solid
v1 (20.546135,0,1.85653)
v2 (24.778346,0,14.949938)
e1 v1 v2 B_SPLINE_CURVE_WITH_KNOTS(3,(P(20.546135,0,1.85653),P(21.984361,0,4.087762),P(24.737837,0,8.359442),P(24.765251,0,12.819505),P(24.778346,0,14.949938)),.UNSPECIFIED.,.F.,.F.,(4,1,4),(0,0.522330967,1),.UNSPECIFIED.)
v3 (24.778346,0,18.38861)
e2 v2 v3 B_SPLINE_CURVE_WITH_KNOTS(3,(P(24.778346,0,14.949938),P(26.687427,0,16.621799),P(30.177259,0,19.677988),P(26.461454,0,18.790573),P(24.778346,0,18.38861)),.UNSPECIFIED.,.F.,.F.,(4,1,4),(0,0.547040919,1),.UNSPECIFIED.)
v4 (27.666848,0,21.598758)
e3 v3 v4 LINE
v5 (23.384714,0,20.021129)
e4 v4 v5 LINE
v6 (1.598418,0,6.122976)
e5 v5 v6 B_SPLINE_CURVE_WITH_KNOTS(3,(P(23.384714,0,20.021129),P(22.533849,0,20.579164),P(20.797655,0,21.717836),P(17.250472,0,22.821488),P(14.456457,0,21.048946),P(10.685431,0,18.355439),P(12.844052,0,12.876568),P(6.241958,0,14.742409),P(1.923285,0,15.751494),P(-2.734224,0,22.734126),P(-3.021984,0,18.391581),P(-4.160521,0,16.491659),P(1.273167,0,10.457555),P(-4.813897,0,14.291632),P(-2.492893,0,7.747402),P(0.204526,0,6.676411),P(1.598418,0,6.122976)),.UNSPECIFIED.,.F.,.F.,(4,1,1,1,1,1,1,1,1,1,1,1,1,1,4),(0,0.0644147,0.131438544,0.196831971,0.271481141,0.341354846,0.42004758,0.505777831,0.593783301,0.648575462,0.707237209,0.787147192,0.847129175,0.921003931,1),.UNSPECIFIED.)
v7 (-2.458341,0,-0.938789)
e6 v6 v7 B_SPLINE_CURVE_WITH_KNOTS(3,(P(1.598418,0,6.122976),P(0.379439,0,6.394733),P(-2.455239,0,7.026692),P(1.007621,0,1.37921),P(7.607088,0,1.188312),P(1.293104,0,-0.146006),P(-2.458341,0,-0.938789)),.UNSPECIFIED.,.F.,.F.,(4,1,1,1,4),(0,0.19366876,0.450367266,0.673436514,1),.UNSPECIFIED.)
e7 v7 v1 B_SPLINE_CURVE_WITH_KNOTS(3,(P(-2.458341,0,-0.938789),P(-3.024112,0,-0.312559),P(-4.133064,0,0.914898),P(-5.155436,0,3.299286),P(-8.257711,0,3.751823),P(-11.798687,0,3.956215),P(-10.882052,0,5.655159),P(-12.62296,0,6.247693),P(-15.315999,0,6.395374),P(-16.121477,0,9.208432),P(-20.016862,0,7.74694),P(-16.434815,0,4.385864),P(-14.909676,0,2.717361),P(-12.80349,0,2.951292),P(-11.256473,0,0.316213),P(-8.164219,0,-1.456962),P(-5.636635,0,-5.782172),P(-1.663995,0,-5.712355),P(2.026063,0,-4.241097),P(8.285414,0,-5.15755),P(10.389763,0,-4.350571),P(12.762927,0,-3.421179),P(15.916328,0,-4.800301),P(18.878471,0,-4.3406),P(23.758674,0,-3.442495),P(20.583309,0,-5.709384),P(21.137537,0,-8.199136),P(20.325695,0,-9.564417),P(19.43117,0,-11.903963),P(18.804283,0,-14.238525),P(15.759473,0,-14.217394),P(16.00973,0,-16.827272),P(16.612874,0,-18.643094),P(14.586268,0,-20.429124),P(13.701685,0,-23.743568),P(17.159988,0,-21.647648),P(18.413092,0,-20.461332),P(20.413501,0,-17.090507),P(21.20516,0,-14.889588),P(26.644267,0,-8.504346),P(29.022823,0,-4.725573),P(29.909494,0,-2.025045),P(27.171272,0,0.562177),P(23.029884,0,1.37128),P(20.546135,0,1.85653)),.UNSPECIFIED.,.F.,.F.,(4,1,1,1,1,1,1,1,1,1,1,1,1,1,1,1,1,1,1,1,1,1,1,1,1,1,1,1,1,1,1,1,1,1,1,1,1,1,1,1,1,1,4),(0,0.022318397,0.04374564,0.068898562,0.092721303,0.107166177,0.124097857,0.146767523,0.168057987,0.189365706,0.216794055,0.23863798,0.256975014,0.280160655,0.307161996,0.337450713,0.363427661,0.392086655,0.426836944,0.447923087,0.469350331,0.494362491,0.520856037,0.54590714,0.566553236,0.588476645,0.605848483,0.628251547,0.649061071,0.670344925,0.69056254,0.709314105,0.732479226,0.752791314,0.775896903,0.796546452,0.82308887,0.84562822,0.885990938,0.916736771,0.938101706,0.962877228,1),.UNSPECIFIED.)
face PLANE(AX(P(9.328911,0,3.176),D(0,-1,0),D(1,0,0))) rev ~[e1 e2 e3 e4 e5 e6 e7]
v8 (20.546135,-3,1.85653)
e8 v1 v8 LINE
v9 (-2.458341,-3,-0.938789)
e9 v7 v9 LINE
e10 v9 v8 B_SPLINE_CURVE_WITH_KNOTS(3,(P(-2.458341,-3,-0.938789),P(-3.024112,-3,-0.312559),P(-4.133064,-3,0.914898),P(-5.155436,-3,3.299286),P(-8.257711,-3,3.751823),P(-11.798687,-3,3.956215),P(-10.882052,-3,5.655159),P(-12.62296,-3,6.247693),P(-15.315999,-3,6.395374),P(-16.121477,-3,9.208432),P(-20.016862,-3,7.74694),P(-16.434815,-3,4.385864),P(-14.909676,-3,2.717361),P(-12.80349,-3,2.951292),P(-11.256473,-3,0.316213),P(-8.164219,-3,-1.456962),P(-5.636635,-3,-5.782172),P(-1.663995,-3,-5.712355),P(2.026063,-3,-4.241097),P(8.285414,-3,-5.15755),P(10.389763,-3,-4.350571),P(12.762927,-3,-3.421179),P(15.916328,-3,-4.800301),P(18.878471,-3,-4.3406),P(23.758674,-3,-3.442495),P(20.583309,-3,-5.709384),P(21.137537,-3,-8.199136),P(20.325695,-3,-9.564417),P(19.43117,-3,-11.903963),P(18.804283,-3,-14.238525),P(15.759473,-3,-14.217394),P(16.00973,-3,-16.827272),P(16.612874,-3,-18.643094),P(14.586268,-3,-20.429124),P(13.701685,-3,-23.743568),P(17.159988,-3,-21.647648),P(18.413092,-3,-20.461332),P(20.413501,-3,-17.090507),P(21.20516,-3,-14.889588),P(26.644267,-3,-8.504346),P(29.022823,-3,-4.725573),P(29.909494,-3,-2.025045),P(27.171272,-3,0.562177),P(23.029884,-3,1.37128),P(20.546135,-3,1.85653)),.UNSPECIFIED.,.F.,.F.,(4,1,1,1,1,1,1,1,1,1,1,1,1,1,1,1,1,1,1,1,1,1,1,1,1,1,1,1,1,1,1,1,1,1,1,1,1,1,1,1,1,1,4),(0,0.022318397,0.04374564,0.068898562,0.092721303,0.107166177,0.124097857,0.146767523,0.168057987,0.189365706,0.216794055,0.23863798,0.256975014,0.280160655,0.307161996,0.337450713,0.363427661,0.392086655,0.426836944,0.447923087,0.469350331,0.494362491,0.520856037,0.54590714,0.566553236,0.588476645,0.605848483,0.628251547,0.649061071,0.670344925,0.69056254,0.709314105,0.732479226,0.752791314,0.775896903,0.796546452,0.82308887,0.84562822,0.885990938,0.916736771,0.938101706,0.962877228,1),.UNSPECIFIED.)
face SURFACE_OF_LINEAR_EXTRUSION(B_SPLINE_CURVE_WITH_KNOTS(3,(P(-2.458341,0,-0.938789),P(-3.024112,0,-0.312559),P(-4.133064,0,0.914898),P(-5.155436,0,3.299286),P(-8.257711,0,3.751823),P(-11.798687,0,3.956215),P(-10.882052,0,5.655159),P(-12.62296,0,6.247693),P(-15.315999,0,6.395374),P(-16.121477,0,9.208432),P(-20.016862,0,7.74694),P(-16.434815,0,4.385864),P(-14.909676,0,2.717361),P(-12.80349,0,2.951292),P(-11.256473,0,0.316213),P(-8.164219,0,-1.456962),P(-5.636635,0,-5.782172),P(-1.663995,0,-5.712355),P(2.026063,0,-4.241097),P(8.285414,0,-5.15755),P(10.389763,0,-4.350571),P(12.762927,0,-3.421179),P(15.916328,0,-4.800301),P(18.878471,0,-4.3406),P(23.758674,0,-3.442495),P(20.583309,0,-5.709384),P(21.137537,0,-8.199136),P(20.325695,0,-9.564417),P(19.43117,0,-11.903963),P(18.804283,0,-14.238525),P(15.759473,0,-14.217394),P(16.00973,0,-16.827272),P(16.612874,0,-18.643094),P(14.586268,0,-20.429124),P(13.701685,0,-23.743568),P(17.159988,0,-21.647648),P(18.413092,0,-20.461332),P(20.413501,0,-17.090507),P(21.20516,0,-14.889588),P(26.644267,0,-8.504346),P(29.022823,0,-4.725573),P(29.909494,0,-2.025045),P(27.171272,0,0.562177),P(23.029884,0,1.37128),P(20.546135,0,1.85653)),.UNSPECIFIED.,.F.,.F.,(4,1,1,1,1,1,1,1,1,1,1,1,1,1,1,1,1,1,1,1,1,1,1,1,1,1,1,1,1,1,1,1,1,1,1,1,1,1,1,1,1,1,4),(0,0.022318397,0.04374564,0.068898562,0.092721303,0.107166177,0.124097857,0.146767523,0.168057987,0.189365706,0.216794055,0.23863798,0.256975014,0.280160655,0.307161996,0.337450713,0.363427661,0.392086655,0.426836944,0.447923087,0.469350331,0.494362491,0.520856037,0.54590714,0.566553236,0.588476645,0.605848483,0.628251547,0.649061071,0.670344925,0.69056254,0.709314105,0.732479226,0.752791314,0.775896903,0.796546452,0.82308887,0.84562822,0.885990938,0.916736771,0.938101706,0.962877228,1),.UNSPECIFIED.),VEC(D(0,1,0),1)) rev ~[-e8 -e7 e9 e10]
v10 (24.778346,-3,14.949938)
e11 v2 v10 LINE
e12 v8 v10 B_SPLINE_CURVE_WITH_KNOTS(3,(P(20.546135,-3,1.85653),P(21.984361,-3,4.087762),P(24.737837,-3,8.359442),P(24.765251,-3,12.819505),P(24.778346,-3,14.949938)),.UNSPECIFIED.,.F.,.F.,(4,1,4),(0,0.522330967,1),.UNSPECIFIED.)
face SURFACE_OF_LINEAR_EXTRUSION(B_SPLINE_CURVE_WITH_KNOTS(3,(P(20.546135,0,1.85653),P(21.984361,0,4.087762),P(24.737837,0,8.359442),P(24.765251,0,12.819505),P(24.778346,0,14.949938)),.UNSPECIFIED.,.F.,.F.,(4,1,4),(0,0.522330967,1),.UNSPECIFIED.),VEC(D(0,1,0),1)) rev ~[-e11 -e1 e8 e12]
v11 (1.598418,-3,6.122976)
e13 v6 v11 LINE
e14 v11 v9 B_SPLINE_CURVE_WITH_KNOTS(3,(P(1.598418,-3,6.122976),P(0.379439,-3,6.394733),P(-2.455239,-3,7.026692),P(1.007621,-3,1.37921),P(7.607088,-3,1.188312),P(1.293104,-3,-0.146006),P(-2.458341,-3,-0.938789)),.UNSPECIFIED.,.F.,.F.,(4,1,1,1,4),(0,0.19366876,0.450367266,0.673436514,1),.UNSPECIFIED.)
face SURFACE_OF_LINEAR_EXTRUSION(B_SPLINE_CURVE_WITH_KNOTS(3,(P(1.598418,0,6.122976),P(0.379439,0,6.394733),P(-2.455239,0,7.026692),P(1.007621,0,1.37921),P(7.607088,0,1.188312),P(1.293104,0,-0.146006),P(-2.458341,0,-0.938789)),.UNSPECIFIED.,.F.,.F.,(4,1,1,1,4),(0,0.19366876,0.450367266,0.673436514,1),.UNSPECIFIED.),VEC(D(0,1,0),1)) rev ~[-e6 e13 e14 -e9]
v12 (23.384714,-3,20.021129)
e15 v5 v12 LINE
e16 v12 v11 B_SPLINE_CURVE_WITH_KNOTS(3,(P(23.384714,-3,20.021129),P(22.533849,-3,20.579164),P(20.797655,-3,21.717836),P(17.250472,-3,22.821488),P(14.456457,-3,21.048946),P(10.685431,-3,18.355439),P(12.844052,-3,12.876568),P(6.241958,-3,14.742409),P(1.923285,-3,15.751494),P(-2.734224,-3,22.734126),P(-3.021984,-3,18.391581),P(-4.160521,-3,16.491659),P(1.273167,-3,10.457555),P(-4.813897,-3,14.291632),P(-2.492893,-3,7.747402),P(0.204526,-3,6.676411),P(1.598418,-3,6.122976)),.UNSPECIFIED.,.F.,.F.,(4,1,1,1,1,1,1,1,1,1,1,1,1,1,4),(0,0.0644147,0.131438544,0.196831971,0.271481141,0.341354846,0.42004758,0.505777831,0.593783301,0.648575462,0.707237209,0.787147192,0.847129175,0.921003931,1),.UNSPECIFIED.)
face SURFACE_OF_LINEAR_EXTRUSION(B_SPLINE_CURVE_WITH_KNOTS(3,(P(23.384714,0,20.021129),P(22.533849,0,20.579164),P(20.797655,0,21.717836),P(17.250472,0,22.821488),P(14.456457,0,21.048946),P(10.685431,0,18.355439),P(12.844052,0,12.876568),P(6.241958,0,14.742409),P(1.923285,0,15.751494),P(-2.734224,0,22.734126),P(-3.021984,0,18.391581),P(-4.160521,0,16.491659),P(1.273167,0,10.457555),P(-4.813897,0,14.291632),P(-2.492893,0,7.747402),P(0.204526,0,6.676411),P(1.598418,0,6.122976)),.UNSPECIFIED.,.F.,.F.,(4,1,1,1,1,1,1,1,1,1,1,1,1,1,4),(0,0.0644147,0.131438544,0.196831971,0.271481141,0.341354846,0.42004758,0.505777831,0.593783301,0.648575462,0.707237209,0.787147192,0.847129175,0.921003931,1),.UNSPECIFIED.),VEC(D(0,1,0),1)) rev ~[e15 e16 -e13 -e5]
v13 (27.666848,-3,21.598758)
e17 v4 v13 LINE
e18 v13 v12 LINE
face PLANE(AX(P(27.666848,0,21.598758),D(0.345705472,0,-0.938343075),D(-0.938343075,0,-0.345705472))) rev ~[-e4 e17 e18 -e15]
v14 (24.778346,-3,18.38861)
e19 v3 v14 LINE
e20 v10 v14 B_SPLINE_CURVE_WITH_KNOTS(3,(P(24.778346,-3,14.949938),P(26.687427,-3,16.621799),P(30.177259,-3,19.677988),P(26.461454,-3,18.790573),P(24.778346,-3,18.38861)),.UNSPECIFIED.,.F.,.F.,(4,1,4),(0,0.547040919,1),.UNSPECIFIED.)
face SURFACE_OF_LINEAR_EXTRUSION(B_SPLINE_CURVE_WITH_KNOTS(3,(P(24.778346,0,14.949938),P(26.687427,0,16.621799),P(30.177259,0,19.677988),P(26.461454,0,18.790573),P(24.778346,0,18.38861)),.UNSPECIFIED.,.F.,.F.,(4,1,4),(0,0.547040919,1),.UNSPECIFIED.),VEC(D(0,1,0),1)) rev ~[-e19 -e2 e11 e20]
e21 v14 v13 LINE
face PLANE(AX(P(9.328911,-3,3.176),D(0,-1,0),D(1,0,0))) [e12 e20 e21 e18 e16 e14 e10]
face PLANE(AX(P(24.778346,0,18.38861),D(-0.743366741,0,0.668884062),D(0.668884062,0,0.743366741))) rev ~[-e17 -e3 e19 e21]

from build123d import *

# Parameters (mm, degrees)
F1_DEPTH = 3


with BuildPart() as f1:
    # F0 (on Front) → F1 (new body)
    with BuildSketch(Plane.XZ):
        with BuildLine():
            add(Edge.make_bspline(
                [(-2.4583407212, -0.9387893369), (-3.024112101, -0.3125586215), (-4.1330640857, 0.9148979442), (-5.1554360197, 3.2992855543), (-8.2577109297, 3.7518231514), (-11.7986873567, 3.9562154981), (-10.8820523568, 5.6551586921), (-12.6229603458, 6.247693459), (-15.315999481, 6.3953744354), (-16.1214771708, 9.2084322286), (-20.0168619315, 7.7469403625), (-16.4348146296, 4.3858640835), (-14.9096763531, 2.717360867), (-12.8034903879, 2.9512923233), (-11.2564726008, 0.3162128421), (-8.1642192374, -1.4569620139), (-5.6366346653, -5.782171544), (-1.6639945807, -5.7123551757), (2.0260628096, -4.2410968084), (8.2854144293, -5.1575498991), (10.3897632677, -4.3505708782), (12.7629271987, -3.4211792935), (15.9163275944, -4.8003006369), (18.878470836, -4.3406003478), (23.758674436, -3.4424946888), (20.5833092456, -5.7093836776), (21.1375367591, -8.1991364923), (20.3256954644, -9.5644173556), (19.4311703622, -11.9039628408), (18.8042825389, -14.238524747), (15.7594730051, -14.2173938905), (16.0097304788, -16.8272720908), (16.6128744696, -18.6430937651), (14.5862678652, -20.4291241442), (13.7016849232, -23.7435679152), (17.1599880674, -21.6476481949), (18.4130917332, -20.4613319605), (20.4135012758, -17.0905072069), (21.2051604651, -14.8895883579), (26.6442672206, -8.5043457259), (29.0228229475, -4.7255734803), (29.9094935065, -2.0250450932), (27.1712719561, 0.5621773403), (23.0298835059, 1.3712804026), (20.5461345613, 1.8565304345)],
                knots=[0, 0, 0, 0, 0.0223183973, 0.0437456398, 0.0688985616, 0.0927213027, 0.1071661769, 0.1240978569, 0.1467675231, 0.1680579867, 0.1893657062, 0.2167940554, 0.2386379801, 0.2569750139, 0.2801606546, 0.307161996, 0.3374507126, 0.3634276608, 0.3920866547, 0.4268369435, 0.4479230873, 0.4693503305, 0.4943624909, 0.5208560372, 0.5459071395, 0.5665532363, 0.5884766445, 0.6058484831, 0.628251547, 0.6490610711, 0.6703449254, 0.6905625398, 0.7093141047, 0.7324792265, 0.7527913136, 0.7758969033, 0.7965464522, 0.8230888703, 0.8456282197, 0.8859909385, 0.9167367705, 0.9381017064, 0.9628772275, 1, 1, 1, 1], degree=3))
            add(Edge.make_bspline(
                [(20.5461345613, 1.8565304345), (21.9843605456, 4.0877615411), (24.7378369306, 8.3594422288), (24.7652508293, 12.8195046032), (24.7783455998, 14.9499382824)],
                knots=[0, 0, 0, 0, 0.5223309675, 1, 1, 1, 1], degree=3))
            add(Edge.make_bspline(
                [(24.7783455998, 14.9499382824), (26.6874267886, 16.6217989258), (30.1772593082, 19.6779882987), (26.4614535575, 18.7905731041), (24.7783455998, 18.3886103332)],
                knots=[0, 0, 0, 0, 0.5470409191, 1, 1, 1, 1], degree=3))
            Line((24.7783455998, 18.3886103332), (27.6668481529, 21.598758176))
            Line((27.6668481529, 21.598758176), (23.3847144991, 20.0211293995))
            add(Edge.make_bspline(
                [(23.3847144991, 20.0211293995), (22.5338494252, 20.5791637074), (20.7976546345, 21.7178357343), (17.2504722248, 22.8214880736), (14.4564571643, 21.0489460918), (10.6854307395, 18.3554386667), (12.8440522505, 12.8765681684), (6.2419581214, 14.7424087726), (1.9232853652, 15.7514937162), (-2.7342242262, 22.7341263785), (-3.0219837282, 18.3915805656), (-4.1605211958, 16.4916585466), (1.2731668381, 10.4575548527), (-4.8138967458, 14.2916323506), (-2.4928932067, 7.7474018762), (0.2045257408, 6.6764107619), (1.5984182246, 6.1229756102)],
                knots=[0, 0, 0, 0, 0.0644146999, 0.1314385439, 0.1968319706, 0.2714811413, 0.3413548458, 0.4200475802, 0.5057778314, 0.5937833005, 0.6485754625, 0.7072372091, 0.7871471919, 0.8471291748, 0.9210039306, 1, 1, 1, 1], degree=3))
            add(Edge.make_bspline(
                [(1.5984182246, 6.1229756102), (0.3794385893, 6.3947330374), (-2.4552391583, 7.0266916932), (1.0076209648, 1.3792102604), (7.607088459, 1.1883117848), (1.2931039504, -0.1460062349), (-2.4583407212, -0.9387893369)],
                knots=[0, 0, 0, 0, 0.1936687603, 0.4503672655, 0.6734365138, 1, 1, 1, 1], degree=3))
        make_face()
        with BuildLine():
            add(Edge.make_bspline(
                [(22.6999428123, 19.3365197629), (22.3242155898, 19.5631626942), (21.4544289305, 20.0878278935), (19.2659041282, 21.4051754613), (16.6460371205, 21.4763759863), (13.5816483172, 20.043221821), (12.2892210529, 17.8095974256), (12.5681196065, 15.0871928348), (12.3230838562, 12.8978219278), (8.8639840954, 13.0449553336), (5.2066810805, 14.151426431), (1.707829216, 14.9353315218), (-1.170779148, 18.1401441424), (-1.5655897851, 20.4183641193), (-2.5929770673, 19.4536346829), (-2.5932049211, 17.9614670798), (-2.6339004563, 16.4813338584), (-0.3224472186, 13.7380850634), (0.6135356219, 11.7639540273), (-0.7167249297, 10.8530067604), (-3.3318702702, 12.7121257392), (-2.5667672816, 10.6745545783), (-1.5094169541, 8.4459250214), (2.1106983207, 7.2381496114), (2.7645327104, 6.2696114421), (3.0224460643, 5.8875591494)],
                knots=[0, 0, 0, 0, 0.0345222802, 0.0799170701, 0.1264160139, 0.1782976735, 0.2232215976, 0.270993781, 0.3087962495, 0.3578588003, 0.4157076401, 0.4703647639, 0.5300860598, 0.5673107508, 0.5934188369, 0.6284721036, 0.6631450996, 0.7179951551, 0.7579670519, 0.788326596, 0.8317622624, 0.8624300866, 0.909423256, 0.9642708426, 1, 1, 1, 1], degree=3))
            Line((22.6999428123, 19.3365197629), (26.0433372777, 20.5682971304))
            Line((26.0433372777, 20.5682971304), (24.0020574897, 18.3859034087))
            add(Edge.make_bspline(
                [(17.7613161504, 1.2181339553), (18.3459469112, 2.0293237663), (19.6496885009, 3.8382978482), (22.3270533593, 7.85048253), (23.2824396662, 12.4940733784), (23.1220059605, 15.9857519702), (25.3202795702, 16.5504719842), (27.8645173763, 18.1667392321), (26.1450777549, 18.0905903306), (24.3352004071, 17.6754938561), (24.0907529204, 18.1967651202), (24.0020574897, 18.3859034087)],
                knots=[0, 0, 0, 0, 0.1275196806, 0.284372158, 0.4427790882, 0.5660647269, 0.6719001823, 0.7765117048, 0.8460306235, 0.9441336855, 1, 1, 1, 1], degree=3))
            add(Edge.make_bspline(
                [(24.4001187384, -3.3008425962), (24.3409545974, -3.6554720505), (24.2018944746, -4.4889974695), (22.2223315181, -5.7543203865), (22.4832289942, -8.9296135449), (20.3988923072, -12.2579807717), (20.019356702, -14.9437682798), (17.1257288874, -14.9016519593), (16.6563720182, -16.1673443115), (17.6416824742, -18.42647415), (15.9248500213, -20.4490406816), (14.6742381442, -22.1678172602), (17.3676591915, -20.8599894053), (19.2062636839, -16.9301620982), (22.395345056, -11.5365370821), (25.0840863289, -7.2209170092), (27.9509062353, -4.1529344918), (28.0643595577, -0.9185538348), (21.4065022533, 0.3237566534), (18.8864877652, 0.9420635642), (17.7613161504, 1.2181339553)],
                knots=[0, 0, 0, 0, 0.0342545275, 0.0805122615, 0.1365401346, 0.2013155909, 0.2511031186, 0.3006525471, 0.3335558205, 0.3817053118, 0.4353696827, 0.4714452042, 0.5144946797, 0.5840870765, 0.6661694447, 0.7406786923, 0.8061006005, 0.8549144632, 0.935220163, 1, 1, 1, 1], degree=3))
            add(Edge.make_bspline(
                [(3.0224460643, 5.8875591494), (2.6605674816, 5.7112317822), (1.9018445059, 5.3415397609), (0.613870925, 5.8961917239), (-0.4468114988, 6.1732975767), (-0.5991275153, 5.4758399813), (0.4148661064, 3.8408525846), (1.4386873446, 2.6784537478), (4.8974896565, 1.8585546414), (6.4785231574, 1.348921805), (5.2639700351, -0.4949434958), (1.2648465469, -0.947879165), (-1.7303055212, -1.9880112414), (-4.1498291031, -1.7144645068), (-5.6092074984, 1.0551090331), (-6.2769311874, 2.7645892095), (-9.7310375403, 2.9240494367), (-12.6399330685, 3.4799357512), (-11.5045287811, 6.0347840809), (-15.3225081475, 4.9080547315), (-15.9460754267, 8.0552125685), (-18.1680344995, 7.8080997394), (-17.0845579282, 5.84994772), (-14.9938162063, 4.0224657221), (-13.0229620708, 3.6056954547), (-10.9976580316, 1.8051812839), (-7.6082138342, 0.7572762248), (-5.7361926252, -3.4870897446), (-1.7411166, -4.7228943753), (2.0828785576, -2.7694583145), (7.3146646675, -4.390656531), (11.2428375966, -1.4464033457), (15.8676265775, -3.939807471), (20.2513749856, -2.6018494682), (23.0434376746, -2.7898009003), (24.001643128, -3.1507427259), (24.4001187384, -3.3008425962)],
                knots=[0, 0, 0, 0, 0.0203763207, 0.0427214636, 0.0607192903, 0.0733745539, 0.0987475418, 0.1228836, 0.158441793, 0.1793079016, 0.202042841, 0.23992768, 0.2739458096, 0.3013412751, 0.3334163755, 0.3575495119, 0.3920799182, 0.4213661423, 0.4439054505, 0.4740907577, 0.5042622531, 0.5252665904, 0.5491831564, 0.5810702351, 0.6073180449, 0.6375310291, 0.6721804859, 0.7112858235, 0.7471787688, 0.7851429286, 0.8275064884, 0.8664485522, 0.9072035833, 0.9471463298, 0.9780204773, 1, 1, 1, 1], degree=3))
        make_face(mode=Mode.SUBTRACT)
        with BuildLine():
            Line((26.0433372777, 20.5682971304), (22.6999428123, 19.3365197629))
            add(Edge.make_bspline(
                [(22.6999428123, 19.3365197629), (22.3242155898, 19.5631626942), (21.4544289305, 20.0878278935), (19.2659041282, 21.4051754613), (16.6460371205, 21.4763759863), (13.5816483172, 20.043221821), (12.2892210529, 17.8095974256), (12.5681196065, 15.0871928348), (12.3230838562, 12.8978219278), (8.8639840954, 13.0449553336), (5.2066810805, 14.151426431), (1.707829216, 14.9353315218), (-1.170779148, 18.1401441424), (-1.5655897851, 20.4183641193), (-2.5929770673, 19.4536346829), (-2.5932049211, 17.9614670798), (-2.6339004563, 16.4813338584), (-0.3224472186, 13.7380850634), (0.6135356219, 11.7639540273), (-0.7167249297, 10.8530067604), (-3.3318702702, 12.7121257392), (-2.5667672816, 10.6745545783), (-1.5094169541, 8.4459250214), (2.1106983207, 7.2381496114), (2.7645327104, 6.2696114421), (3.0224460643, 5.8875591494)],
                knots=[0, 0, 0, 0, 0.0345222802, 0.0799170701, 0.1264160139, 0.1782976735, 0.2232215976, 0.270993781, 0.3087962495, 0.3578588003, 0.4157076401, 0.4703647639, 0.5300860598, 0.5673107508, 0.5934188369, 0.6284721036, 0.6631450996, 0.7179951551, 0.7579670519, 0.788326596, 0.8317622624, 0.8624300866, 0.909423256, 0.9642708426, 1, 1, 1, 1], degree=3))
            add(Edge.make_bspline(
                [(3.0224460643, 5.8875591494), (2.6605674816, 5.7112317822), (1.9018445059, 5.3415397609), (0.613870925, 5.8961917239), (-0.4468114988, 6.1732975767), (-0.5991275153, 5.4758399813), (0.4148661064, 3.8408525846), (1.4386873446, 2.6784537478), (4.8974896565, 1.8585546414), (6.4785231574, 1.348921805), (5.2639700351, -0.4949434958), (1.2648465469, -0.947879165), (-1.7303055212, -1.9880112414), (-4.1498291031, -1.7144645068), (-5.6092074984, 1.0551090331), (-6.2769311874, 2.7645892095), (-9.7310375403, 2.9240494367), (-12.6399330685, 3.4799357512), (-11.5045287811, 6.0347840809), (-15.3225081475, 4.9080547315), (-15.9460754267, 8.0552125685), (-18.1680344995, 7.8080997394), (-17.0845579282, 5.84994772), (-14.9938162063, 4.0224657221), (-13.0229620708, 3.6056954547), (-10.9976580316, 1.8051812839), (-7.6082138342, 0.7572762248), (-5.7361926252, -3.4870897446), (-1.7411166, -4.7228943753), (2.0828785576, -2.7694583145), (7.3146646675, -4.390656531), (11.2428375966, -1.4464033457), (15.8676265775, -3.939807471), (20.2513749856, -2.6018494682), (23.0434376746, -2.7898009003), (24.001643128, -3.1507427259), (24.4001187384, -3.3008425962)],
                knots=[0, 0, 0, 0, 0.0203763207, 0.0427214636, 0.0607192903, 0.0733745539, 0.0987475418, 0.1228836, 0.158441793, 0.1793079016, 0.202042841, 0.23992768, 0.2739458096, 0.3013412751, 0.3334163755, 0.3575495119, 0.3920799182, 0.4213661423, 0.4439054505, 0.4740907577, 0.5042622531, 0.5252665904, 0.5491831564, 0.5810702351, 0.6073180449, 0.6375310291, 0.6721804859, 0.7112858235, 0.7471787688, 0.7851429286, 0.8275064884, 0.8664485522, 0.9072035833, 0.9471463298, 0.9780204773, 1, 1, 1, 1], degree=3))
            add(Edge.make_bspline(
                [(24.4001187384, -3.3008425962), (24.3409545974, -3.6554720505), (24.2018944746, -4.4889974695), (22.2223315181, -5.7543203865), (22.4832289942, -8.9296135449), (20.3988923072, -12.2579807717), (20.019356702, -14.9437682798), (17.1257288874, -14.9016519593), (16.6563720182, -16.1673443115), (17.6416824742, -18.42647415), (15.9248500213, -20.4490406816), (14.6742381442, -22.1678172602), (17.3676591915, -20.8599894053), (19.2062636839, -16.9301620982), (22.395345056, -11.5365370821), (25.0840863289, -7.2209170092), (27.9509062353, -4.1529344918), (28.0643595577, -0.9185538348), (21.4065022533, 0.3237566534), (18.8864877652, 0.9420635642), (17.7613161504, 1.2181339553)],
                knots=[0, 0, 0, 0, 0.0342545275, 0.0805122615, 0.1365401346, 0.2013155909, 0.2511031186, 0.3006525471, 0.3335558205, 0.3817053118, 0.4353696827, 0.4714452042, 0.5144946797, 0.5840870765, 0.6661694447, 0.7406786923, 0.8061006005, 0.8549144632, 0.935220163, 1, 1, 1, 1], degree=3))
            add(Edge.make_bspline(
                [(17.7613161504, 1.2181339553), (18.3459469112, 2.0293237663), (19.6496885009, 3.8382978482), (22.3270533593, 7.85048253), (23.2824396662, 12.4940733784), (23.1220059605, 15.9857519702), (25.3202795702, 16.5504719842), (27.8645173763, 18.1667392321), (26.1450777549, 18.0905903306), (24.3352004071, 17.6754938561), (24.0907529204, 18.1967651202), (24.0020574897, 18.3859034087)],
                knots=[0, 0, 0, 0, 0.1275196806, 0.284372158, 0.4427790882, 0.5660647269, 0.6719001823, 0.7765117048, 0.8460306235, 0.9441336855, 1, 1, 1, 1], degree=3))
            Line((24.0020574897, 18.3859034087), (26.0433372777, 20.5682971304))
        make_face()
    extrude(amount=F1_DEPTH)


solid = f1.part
